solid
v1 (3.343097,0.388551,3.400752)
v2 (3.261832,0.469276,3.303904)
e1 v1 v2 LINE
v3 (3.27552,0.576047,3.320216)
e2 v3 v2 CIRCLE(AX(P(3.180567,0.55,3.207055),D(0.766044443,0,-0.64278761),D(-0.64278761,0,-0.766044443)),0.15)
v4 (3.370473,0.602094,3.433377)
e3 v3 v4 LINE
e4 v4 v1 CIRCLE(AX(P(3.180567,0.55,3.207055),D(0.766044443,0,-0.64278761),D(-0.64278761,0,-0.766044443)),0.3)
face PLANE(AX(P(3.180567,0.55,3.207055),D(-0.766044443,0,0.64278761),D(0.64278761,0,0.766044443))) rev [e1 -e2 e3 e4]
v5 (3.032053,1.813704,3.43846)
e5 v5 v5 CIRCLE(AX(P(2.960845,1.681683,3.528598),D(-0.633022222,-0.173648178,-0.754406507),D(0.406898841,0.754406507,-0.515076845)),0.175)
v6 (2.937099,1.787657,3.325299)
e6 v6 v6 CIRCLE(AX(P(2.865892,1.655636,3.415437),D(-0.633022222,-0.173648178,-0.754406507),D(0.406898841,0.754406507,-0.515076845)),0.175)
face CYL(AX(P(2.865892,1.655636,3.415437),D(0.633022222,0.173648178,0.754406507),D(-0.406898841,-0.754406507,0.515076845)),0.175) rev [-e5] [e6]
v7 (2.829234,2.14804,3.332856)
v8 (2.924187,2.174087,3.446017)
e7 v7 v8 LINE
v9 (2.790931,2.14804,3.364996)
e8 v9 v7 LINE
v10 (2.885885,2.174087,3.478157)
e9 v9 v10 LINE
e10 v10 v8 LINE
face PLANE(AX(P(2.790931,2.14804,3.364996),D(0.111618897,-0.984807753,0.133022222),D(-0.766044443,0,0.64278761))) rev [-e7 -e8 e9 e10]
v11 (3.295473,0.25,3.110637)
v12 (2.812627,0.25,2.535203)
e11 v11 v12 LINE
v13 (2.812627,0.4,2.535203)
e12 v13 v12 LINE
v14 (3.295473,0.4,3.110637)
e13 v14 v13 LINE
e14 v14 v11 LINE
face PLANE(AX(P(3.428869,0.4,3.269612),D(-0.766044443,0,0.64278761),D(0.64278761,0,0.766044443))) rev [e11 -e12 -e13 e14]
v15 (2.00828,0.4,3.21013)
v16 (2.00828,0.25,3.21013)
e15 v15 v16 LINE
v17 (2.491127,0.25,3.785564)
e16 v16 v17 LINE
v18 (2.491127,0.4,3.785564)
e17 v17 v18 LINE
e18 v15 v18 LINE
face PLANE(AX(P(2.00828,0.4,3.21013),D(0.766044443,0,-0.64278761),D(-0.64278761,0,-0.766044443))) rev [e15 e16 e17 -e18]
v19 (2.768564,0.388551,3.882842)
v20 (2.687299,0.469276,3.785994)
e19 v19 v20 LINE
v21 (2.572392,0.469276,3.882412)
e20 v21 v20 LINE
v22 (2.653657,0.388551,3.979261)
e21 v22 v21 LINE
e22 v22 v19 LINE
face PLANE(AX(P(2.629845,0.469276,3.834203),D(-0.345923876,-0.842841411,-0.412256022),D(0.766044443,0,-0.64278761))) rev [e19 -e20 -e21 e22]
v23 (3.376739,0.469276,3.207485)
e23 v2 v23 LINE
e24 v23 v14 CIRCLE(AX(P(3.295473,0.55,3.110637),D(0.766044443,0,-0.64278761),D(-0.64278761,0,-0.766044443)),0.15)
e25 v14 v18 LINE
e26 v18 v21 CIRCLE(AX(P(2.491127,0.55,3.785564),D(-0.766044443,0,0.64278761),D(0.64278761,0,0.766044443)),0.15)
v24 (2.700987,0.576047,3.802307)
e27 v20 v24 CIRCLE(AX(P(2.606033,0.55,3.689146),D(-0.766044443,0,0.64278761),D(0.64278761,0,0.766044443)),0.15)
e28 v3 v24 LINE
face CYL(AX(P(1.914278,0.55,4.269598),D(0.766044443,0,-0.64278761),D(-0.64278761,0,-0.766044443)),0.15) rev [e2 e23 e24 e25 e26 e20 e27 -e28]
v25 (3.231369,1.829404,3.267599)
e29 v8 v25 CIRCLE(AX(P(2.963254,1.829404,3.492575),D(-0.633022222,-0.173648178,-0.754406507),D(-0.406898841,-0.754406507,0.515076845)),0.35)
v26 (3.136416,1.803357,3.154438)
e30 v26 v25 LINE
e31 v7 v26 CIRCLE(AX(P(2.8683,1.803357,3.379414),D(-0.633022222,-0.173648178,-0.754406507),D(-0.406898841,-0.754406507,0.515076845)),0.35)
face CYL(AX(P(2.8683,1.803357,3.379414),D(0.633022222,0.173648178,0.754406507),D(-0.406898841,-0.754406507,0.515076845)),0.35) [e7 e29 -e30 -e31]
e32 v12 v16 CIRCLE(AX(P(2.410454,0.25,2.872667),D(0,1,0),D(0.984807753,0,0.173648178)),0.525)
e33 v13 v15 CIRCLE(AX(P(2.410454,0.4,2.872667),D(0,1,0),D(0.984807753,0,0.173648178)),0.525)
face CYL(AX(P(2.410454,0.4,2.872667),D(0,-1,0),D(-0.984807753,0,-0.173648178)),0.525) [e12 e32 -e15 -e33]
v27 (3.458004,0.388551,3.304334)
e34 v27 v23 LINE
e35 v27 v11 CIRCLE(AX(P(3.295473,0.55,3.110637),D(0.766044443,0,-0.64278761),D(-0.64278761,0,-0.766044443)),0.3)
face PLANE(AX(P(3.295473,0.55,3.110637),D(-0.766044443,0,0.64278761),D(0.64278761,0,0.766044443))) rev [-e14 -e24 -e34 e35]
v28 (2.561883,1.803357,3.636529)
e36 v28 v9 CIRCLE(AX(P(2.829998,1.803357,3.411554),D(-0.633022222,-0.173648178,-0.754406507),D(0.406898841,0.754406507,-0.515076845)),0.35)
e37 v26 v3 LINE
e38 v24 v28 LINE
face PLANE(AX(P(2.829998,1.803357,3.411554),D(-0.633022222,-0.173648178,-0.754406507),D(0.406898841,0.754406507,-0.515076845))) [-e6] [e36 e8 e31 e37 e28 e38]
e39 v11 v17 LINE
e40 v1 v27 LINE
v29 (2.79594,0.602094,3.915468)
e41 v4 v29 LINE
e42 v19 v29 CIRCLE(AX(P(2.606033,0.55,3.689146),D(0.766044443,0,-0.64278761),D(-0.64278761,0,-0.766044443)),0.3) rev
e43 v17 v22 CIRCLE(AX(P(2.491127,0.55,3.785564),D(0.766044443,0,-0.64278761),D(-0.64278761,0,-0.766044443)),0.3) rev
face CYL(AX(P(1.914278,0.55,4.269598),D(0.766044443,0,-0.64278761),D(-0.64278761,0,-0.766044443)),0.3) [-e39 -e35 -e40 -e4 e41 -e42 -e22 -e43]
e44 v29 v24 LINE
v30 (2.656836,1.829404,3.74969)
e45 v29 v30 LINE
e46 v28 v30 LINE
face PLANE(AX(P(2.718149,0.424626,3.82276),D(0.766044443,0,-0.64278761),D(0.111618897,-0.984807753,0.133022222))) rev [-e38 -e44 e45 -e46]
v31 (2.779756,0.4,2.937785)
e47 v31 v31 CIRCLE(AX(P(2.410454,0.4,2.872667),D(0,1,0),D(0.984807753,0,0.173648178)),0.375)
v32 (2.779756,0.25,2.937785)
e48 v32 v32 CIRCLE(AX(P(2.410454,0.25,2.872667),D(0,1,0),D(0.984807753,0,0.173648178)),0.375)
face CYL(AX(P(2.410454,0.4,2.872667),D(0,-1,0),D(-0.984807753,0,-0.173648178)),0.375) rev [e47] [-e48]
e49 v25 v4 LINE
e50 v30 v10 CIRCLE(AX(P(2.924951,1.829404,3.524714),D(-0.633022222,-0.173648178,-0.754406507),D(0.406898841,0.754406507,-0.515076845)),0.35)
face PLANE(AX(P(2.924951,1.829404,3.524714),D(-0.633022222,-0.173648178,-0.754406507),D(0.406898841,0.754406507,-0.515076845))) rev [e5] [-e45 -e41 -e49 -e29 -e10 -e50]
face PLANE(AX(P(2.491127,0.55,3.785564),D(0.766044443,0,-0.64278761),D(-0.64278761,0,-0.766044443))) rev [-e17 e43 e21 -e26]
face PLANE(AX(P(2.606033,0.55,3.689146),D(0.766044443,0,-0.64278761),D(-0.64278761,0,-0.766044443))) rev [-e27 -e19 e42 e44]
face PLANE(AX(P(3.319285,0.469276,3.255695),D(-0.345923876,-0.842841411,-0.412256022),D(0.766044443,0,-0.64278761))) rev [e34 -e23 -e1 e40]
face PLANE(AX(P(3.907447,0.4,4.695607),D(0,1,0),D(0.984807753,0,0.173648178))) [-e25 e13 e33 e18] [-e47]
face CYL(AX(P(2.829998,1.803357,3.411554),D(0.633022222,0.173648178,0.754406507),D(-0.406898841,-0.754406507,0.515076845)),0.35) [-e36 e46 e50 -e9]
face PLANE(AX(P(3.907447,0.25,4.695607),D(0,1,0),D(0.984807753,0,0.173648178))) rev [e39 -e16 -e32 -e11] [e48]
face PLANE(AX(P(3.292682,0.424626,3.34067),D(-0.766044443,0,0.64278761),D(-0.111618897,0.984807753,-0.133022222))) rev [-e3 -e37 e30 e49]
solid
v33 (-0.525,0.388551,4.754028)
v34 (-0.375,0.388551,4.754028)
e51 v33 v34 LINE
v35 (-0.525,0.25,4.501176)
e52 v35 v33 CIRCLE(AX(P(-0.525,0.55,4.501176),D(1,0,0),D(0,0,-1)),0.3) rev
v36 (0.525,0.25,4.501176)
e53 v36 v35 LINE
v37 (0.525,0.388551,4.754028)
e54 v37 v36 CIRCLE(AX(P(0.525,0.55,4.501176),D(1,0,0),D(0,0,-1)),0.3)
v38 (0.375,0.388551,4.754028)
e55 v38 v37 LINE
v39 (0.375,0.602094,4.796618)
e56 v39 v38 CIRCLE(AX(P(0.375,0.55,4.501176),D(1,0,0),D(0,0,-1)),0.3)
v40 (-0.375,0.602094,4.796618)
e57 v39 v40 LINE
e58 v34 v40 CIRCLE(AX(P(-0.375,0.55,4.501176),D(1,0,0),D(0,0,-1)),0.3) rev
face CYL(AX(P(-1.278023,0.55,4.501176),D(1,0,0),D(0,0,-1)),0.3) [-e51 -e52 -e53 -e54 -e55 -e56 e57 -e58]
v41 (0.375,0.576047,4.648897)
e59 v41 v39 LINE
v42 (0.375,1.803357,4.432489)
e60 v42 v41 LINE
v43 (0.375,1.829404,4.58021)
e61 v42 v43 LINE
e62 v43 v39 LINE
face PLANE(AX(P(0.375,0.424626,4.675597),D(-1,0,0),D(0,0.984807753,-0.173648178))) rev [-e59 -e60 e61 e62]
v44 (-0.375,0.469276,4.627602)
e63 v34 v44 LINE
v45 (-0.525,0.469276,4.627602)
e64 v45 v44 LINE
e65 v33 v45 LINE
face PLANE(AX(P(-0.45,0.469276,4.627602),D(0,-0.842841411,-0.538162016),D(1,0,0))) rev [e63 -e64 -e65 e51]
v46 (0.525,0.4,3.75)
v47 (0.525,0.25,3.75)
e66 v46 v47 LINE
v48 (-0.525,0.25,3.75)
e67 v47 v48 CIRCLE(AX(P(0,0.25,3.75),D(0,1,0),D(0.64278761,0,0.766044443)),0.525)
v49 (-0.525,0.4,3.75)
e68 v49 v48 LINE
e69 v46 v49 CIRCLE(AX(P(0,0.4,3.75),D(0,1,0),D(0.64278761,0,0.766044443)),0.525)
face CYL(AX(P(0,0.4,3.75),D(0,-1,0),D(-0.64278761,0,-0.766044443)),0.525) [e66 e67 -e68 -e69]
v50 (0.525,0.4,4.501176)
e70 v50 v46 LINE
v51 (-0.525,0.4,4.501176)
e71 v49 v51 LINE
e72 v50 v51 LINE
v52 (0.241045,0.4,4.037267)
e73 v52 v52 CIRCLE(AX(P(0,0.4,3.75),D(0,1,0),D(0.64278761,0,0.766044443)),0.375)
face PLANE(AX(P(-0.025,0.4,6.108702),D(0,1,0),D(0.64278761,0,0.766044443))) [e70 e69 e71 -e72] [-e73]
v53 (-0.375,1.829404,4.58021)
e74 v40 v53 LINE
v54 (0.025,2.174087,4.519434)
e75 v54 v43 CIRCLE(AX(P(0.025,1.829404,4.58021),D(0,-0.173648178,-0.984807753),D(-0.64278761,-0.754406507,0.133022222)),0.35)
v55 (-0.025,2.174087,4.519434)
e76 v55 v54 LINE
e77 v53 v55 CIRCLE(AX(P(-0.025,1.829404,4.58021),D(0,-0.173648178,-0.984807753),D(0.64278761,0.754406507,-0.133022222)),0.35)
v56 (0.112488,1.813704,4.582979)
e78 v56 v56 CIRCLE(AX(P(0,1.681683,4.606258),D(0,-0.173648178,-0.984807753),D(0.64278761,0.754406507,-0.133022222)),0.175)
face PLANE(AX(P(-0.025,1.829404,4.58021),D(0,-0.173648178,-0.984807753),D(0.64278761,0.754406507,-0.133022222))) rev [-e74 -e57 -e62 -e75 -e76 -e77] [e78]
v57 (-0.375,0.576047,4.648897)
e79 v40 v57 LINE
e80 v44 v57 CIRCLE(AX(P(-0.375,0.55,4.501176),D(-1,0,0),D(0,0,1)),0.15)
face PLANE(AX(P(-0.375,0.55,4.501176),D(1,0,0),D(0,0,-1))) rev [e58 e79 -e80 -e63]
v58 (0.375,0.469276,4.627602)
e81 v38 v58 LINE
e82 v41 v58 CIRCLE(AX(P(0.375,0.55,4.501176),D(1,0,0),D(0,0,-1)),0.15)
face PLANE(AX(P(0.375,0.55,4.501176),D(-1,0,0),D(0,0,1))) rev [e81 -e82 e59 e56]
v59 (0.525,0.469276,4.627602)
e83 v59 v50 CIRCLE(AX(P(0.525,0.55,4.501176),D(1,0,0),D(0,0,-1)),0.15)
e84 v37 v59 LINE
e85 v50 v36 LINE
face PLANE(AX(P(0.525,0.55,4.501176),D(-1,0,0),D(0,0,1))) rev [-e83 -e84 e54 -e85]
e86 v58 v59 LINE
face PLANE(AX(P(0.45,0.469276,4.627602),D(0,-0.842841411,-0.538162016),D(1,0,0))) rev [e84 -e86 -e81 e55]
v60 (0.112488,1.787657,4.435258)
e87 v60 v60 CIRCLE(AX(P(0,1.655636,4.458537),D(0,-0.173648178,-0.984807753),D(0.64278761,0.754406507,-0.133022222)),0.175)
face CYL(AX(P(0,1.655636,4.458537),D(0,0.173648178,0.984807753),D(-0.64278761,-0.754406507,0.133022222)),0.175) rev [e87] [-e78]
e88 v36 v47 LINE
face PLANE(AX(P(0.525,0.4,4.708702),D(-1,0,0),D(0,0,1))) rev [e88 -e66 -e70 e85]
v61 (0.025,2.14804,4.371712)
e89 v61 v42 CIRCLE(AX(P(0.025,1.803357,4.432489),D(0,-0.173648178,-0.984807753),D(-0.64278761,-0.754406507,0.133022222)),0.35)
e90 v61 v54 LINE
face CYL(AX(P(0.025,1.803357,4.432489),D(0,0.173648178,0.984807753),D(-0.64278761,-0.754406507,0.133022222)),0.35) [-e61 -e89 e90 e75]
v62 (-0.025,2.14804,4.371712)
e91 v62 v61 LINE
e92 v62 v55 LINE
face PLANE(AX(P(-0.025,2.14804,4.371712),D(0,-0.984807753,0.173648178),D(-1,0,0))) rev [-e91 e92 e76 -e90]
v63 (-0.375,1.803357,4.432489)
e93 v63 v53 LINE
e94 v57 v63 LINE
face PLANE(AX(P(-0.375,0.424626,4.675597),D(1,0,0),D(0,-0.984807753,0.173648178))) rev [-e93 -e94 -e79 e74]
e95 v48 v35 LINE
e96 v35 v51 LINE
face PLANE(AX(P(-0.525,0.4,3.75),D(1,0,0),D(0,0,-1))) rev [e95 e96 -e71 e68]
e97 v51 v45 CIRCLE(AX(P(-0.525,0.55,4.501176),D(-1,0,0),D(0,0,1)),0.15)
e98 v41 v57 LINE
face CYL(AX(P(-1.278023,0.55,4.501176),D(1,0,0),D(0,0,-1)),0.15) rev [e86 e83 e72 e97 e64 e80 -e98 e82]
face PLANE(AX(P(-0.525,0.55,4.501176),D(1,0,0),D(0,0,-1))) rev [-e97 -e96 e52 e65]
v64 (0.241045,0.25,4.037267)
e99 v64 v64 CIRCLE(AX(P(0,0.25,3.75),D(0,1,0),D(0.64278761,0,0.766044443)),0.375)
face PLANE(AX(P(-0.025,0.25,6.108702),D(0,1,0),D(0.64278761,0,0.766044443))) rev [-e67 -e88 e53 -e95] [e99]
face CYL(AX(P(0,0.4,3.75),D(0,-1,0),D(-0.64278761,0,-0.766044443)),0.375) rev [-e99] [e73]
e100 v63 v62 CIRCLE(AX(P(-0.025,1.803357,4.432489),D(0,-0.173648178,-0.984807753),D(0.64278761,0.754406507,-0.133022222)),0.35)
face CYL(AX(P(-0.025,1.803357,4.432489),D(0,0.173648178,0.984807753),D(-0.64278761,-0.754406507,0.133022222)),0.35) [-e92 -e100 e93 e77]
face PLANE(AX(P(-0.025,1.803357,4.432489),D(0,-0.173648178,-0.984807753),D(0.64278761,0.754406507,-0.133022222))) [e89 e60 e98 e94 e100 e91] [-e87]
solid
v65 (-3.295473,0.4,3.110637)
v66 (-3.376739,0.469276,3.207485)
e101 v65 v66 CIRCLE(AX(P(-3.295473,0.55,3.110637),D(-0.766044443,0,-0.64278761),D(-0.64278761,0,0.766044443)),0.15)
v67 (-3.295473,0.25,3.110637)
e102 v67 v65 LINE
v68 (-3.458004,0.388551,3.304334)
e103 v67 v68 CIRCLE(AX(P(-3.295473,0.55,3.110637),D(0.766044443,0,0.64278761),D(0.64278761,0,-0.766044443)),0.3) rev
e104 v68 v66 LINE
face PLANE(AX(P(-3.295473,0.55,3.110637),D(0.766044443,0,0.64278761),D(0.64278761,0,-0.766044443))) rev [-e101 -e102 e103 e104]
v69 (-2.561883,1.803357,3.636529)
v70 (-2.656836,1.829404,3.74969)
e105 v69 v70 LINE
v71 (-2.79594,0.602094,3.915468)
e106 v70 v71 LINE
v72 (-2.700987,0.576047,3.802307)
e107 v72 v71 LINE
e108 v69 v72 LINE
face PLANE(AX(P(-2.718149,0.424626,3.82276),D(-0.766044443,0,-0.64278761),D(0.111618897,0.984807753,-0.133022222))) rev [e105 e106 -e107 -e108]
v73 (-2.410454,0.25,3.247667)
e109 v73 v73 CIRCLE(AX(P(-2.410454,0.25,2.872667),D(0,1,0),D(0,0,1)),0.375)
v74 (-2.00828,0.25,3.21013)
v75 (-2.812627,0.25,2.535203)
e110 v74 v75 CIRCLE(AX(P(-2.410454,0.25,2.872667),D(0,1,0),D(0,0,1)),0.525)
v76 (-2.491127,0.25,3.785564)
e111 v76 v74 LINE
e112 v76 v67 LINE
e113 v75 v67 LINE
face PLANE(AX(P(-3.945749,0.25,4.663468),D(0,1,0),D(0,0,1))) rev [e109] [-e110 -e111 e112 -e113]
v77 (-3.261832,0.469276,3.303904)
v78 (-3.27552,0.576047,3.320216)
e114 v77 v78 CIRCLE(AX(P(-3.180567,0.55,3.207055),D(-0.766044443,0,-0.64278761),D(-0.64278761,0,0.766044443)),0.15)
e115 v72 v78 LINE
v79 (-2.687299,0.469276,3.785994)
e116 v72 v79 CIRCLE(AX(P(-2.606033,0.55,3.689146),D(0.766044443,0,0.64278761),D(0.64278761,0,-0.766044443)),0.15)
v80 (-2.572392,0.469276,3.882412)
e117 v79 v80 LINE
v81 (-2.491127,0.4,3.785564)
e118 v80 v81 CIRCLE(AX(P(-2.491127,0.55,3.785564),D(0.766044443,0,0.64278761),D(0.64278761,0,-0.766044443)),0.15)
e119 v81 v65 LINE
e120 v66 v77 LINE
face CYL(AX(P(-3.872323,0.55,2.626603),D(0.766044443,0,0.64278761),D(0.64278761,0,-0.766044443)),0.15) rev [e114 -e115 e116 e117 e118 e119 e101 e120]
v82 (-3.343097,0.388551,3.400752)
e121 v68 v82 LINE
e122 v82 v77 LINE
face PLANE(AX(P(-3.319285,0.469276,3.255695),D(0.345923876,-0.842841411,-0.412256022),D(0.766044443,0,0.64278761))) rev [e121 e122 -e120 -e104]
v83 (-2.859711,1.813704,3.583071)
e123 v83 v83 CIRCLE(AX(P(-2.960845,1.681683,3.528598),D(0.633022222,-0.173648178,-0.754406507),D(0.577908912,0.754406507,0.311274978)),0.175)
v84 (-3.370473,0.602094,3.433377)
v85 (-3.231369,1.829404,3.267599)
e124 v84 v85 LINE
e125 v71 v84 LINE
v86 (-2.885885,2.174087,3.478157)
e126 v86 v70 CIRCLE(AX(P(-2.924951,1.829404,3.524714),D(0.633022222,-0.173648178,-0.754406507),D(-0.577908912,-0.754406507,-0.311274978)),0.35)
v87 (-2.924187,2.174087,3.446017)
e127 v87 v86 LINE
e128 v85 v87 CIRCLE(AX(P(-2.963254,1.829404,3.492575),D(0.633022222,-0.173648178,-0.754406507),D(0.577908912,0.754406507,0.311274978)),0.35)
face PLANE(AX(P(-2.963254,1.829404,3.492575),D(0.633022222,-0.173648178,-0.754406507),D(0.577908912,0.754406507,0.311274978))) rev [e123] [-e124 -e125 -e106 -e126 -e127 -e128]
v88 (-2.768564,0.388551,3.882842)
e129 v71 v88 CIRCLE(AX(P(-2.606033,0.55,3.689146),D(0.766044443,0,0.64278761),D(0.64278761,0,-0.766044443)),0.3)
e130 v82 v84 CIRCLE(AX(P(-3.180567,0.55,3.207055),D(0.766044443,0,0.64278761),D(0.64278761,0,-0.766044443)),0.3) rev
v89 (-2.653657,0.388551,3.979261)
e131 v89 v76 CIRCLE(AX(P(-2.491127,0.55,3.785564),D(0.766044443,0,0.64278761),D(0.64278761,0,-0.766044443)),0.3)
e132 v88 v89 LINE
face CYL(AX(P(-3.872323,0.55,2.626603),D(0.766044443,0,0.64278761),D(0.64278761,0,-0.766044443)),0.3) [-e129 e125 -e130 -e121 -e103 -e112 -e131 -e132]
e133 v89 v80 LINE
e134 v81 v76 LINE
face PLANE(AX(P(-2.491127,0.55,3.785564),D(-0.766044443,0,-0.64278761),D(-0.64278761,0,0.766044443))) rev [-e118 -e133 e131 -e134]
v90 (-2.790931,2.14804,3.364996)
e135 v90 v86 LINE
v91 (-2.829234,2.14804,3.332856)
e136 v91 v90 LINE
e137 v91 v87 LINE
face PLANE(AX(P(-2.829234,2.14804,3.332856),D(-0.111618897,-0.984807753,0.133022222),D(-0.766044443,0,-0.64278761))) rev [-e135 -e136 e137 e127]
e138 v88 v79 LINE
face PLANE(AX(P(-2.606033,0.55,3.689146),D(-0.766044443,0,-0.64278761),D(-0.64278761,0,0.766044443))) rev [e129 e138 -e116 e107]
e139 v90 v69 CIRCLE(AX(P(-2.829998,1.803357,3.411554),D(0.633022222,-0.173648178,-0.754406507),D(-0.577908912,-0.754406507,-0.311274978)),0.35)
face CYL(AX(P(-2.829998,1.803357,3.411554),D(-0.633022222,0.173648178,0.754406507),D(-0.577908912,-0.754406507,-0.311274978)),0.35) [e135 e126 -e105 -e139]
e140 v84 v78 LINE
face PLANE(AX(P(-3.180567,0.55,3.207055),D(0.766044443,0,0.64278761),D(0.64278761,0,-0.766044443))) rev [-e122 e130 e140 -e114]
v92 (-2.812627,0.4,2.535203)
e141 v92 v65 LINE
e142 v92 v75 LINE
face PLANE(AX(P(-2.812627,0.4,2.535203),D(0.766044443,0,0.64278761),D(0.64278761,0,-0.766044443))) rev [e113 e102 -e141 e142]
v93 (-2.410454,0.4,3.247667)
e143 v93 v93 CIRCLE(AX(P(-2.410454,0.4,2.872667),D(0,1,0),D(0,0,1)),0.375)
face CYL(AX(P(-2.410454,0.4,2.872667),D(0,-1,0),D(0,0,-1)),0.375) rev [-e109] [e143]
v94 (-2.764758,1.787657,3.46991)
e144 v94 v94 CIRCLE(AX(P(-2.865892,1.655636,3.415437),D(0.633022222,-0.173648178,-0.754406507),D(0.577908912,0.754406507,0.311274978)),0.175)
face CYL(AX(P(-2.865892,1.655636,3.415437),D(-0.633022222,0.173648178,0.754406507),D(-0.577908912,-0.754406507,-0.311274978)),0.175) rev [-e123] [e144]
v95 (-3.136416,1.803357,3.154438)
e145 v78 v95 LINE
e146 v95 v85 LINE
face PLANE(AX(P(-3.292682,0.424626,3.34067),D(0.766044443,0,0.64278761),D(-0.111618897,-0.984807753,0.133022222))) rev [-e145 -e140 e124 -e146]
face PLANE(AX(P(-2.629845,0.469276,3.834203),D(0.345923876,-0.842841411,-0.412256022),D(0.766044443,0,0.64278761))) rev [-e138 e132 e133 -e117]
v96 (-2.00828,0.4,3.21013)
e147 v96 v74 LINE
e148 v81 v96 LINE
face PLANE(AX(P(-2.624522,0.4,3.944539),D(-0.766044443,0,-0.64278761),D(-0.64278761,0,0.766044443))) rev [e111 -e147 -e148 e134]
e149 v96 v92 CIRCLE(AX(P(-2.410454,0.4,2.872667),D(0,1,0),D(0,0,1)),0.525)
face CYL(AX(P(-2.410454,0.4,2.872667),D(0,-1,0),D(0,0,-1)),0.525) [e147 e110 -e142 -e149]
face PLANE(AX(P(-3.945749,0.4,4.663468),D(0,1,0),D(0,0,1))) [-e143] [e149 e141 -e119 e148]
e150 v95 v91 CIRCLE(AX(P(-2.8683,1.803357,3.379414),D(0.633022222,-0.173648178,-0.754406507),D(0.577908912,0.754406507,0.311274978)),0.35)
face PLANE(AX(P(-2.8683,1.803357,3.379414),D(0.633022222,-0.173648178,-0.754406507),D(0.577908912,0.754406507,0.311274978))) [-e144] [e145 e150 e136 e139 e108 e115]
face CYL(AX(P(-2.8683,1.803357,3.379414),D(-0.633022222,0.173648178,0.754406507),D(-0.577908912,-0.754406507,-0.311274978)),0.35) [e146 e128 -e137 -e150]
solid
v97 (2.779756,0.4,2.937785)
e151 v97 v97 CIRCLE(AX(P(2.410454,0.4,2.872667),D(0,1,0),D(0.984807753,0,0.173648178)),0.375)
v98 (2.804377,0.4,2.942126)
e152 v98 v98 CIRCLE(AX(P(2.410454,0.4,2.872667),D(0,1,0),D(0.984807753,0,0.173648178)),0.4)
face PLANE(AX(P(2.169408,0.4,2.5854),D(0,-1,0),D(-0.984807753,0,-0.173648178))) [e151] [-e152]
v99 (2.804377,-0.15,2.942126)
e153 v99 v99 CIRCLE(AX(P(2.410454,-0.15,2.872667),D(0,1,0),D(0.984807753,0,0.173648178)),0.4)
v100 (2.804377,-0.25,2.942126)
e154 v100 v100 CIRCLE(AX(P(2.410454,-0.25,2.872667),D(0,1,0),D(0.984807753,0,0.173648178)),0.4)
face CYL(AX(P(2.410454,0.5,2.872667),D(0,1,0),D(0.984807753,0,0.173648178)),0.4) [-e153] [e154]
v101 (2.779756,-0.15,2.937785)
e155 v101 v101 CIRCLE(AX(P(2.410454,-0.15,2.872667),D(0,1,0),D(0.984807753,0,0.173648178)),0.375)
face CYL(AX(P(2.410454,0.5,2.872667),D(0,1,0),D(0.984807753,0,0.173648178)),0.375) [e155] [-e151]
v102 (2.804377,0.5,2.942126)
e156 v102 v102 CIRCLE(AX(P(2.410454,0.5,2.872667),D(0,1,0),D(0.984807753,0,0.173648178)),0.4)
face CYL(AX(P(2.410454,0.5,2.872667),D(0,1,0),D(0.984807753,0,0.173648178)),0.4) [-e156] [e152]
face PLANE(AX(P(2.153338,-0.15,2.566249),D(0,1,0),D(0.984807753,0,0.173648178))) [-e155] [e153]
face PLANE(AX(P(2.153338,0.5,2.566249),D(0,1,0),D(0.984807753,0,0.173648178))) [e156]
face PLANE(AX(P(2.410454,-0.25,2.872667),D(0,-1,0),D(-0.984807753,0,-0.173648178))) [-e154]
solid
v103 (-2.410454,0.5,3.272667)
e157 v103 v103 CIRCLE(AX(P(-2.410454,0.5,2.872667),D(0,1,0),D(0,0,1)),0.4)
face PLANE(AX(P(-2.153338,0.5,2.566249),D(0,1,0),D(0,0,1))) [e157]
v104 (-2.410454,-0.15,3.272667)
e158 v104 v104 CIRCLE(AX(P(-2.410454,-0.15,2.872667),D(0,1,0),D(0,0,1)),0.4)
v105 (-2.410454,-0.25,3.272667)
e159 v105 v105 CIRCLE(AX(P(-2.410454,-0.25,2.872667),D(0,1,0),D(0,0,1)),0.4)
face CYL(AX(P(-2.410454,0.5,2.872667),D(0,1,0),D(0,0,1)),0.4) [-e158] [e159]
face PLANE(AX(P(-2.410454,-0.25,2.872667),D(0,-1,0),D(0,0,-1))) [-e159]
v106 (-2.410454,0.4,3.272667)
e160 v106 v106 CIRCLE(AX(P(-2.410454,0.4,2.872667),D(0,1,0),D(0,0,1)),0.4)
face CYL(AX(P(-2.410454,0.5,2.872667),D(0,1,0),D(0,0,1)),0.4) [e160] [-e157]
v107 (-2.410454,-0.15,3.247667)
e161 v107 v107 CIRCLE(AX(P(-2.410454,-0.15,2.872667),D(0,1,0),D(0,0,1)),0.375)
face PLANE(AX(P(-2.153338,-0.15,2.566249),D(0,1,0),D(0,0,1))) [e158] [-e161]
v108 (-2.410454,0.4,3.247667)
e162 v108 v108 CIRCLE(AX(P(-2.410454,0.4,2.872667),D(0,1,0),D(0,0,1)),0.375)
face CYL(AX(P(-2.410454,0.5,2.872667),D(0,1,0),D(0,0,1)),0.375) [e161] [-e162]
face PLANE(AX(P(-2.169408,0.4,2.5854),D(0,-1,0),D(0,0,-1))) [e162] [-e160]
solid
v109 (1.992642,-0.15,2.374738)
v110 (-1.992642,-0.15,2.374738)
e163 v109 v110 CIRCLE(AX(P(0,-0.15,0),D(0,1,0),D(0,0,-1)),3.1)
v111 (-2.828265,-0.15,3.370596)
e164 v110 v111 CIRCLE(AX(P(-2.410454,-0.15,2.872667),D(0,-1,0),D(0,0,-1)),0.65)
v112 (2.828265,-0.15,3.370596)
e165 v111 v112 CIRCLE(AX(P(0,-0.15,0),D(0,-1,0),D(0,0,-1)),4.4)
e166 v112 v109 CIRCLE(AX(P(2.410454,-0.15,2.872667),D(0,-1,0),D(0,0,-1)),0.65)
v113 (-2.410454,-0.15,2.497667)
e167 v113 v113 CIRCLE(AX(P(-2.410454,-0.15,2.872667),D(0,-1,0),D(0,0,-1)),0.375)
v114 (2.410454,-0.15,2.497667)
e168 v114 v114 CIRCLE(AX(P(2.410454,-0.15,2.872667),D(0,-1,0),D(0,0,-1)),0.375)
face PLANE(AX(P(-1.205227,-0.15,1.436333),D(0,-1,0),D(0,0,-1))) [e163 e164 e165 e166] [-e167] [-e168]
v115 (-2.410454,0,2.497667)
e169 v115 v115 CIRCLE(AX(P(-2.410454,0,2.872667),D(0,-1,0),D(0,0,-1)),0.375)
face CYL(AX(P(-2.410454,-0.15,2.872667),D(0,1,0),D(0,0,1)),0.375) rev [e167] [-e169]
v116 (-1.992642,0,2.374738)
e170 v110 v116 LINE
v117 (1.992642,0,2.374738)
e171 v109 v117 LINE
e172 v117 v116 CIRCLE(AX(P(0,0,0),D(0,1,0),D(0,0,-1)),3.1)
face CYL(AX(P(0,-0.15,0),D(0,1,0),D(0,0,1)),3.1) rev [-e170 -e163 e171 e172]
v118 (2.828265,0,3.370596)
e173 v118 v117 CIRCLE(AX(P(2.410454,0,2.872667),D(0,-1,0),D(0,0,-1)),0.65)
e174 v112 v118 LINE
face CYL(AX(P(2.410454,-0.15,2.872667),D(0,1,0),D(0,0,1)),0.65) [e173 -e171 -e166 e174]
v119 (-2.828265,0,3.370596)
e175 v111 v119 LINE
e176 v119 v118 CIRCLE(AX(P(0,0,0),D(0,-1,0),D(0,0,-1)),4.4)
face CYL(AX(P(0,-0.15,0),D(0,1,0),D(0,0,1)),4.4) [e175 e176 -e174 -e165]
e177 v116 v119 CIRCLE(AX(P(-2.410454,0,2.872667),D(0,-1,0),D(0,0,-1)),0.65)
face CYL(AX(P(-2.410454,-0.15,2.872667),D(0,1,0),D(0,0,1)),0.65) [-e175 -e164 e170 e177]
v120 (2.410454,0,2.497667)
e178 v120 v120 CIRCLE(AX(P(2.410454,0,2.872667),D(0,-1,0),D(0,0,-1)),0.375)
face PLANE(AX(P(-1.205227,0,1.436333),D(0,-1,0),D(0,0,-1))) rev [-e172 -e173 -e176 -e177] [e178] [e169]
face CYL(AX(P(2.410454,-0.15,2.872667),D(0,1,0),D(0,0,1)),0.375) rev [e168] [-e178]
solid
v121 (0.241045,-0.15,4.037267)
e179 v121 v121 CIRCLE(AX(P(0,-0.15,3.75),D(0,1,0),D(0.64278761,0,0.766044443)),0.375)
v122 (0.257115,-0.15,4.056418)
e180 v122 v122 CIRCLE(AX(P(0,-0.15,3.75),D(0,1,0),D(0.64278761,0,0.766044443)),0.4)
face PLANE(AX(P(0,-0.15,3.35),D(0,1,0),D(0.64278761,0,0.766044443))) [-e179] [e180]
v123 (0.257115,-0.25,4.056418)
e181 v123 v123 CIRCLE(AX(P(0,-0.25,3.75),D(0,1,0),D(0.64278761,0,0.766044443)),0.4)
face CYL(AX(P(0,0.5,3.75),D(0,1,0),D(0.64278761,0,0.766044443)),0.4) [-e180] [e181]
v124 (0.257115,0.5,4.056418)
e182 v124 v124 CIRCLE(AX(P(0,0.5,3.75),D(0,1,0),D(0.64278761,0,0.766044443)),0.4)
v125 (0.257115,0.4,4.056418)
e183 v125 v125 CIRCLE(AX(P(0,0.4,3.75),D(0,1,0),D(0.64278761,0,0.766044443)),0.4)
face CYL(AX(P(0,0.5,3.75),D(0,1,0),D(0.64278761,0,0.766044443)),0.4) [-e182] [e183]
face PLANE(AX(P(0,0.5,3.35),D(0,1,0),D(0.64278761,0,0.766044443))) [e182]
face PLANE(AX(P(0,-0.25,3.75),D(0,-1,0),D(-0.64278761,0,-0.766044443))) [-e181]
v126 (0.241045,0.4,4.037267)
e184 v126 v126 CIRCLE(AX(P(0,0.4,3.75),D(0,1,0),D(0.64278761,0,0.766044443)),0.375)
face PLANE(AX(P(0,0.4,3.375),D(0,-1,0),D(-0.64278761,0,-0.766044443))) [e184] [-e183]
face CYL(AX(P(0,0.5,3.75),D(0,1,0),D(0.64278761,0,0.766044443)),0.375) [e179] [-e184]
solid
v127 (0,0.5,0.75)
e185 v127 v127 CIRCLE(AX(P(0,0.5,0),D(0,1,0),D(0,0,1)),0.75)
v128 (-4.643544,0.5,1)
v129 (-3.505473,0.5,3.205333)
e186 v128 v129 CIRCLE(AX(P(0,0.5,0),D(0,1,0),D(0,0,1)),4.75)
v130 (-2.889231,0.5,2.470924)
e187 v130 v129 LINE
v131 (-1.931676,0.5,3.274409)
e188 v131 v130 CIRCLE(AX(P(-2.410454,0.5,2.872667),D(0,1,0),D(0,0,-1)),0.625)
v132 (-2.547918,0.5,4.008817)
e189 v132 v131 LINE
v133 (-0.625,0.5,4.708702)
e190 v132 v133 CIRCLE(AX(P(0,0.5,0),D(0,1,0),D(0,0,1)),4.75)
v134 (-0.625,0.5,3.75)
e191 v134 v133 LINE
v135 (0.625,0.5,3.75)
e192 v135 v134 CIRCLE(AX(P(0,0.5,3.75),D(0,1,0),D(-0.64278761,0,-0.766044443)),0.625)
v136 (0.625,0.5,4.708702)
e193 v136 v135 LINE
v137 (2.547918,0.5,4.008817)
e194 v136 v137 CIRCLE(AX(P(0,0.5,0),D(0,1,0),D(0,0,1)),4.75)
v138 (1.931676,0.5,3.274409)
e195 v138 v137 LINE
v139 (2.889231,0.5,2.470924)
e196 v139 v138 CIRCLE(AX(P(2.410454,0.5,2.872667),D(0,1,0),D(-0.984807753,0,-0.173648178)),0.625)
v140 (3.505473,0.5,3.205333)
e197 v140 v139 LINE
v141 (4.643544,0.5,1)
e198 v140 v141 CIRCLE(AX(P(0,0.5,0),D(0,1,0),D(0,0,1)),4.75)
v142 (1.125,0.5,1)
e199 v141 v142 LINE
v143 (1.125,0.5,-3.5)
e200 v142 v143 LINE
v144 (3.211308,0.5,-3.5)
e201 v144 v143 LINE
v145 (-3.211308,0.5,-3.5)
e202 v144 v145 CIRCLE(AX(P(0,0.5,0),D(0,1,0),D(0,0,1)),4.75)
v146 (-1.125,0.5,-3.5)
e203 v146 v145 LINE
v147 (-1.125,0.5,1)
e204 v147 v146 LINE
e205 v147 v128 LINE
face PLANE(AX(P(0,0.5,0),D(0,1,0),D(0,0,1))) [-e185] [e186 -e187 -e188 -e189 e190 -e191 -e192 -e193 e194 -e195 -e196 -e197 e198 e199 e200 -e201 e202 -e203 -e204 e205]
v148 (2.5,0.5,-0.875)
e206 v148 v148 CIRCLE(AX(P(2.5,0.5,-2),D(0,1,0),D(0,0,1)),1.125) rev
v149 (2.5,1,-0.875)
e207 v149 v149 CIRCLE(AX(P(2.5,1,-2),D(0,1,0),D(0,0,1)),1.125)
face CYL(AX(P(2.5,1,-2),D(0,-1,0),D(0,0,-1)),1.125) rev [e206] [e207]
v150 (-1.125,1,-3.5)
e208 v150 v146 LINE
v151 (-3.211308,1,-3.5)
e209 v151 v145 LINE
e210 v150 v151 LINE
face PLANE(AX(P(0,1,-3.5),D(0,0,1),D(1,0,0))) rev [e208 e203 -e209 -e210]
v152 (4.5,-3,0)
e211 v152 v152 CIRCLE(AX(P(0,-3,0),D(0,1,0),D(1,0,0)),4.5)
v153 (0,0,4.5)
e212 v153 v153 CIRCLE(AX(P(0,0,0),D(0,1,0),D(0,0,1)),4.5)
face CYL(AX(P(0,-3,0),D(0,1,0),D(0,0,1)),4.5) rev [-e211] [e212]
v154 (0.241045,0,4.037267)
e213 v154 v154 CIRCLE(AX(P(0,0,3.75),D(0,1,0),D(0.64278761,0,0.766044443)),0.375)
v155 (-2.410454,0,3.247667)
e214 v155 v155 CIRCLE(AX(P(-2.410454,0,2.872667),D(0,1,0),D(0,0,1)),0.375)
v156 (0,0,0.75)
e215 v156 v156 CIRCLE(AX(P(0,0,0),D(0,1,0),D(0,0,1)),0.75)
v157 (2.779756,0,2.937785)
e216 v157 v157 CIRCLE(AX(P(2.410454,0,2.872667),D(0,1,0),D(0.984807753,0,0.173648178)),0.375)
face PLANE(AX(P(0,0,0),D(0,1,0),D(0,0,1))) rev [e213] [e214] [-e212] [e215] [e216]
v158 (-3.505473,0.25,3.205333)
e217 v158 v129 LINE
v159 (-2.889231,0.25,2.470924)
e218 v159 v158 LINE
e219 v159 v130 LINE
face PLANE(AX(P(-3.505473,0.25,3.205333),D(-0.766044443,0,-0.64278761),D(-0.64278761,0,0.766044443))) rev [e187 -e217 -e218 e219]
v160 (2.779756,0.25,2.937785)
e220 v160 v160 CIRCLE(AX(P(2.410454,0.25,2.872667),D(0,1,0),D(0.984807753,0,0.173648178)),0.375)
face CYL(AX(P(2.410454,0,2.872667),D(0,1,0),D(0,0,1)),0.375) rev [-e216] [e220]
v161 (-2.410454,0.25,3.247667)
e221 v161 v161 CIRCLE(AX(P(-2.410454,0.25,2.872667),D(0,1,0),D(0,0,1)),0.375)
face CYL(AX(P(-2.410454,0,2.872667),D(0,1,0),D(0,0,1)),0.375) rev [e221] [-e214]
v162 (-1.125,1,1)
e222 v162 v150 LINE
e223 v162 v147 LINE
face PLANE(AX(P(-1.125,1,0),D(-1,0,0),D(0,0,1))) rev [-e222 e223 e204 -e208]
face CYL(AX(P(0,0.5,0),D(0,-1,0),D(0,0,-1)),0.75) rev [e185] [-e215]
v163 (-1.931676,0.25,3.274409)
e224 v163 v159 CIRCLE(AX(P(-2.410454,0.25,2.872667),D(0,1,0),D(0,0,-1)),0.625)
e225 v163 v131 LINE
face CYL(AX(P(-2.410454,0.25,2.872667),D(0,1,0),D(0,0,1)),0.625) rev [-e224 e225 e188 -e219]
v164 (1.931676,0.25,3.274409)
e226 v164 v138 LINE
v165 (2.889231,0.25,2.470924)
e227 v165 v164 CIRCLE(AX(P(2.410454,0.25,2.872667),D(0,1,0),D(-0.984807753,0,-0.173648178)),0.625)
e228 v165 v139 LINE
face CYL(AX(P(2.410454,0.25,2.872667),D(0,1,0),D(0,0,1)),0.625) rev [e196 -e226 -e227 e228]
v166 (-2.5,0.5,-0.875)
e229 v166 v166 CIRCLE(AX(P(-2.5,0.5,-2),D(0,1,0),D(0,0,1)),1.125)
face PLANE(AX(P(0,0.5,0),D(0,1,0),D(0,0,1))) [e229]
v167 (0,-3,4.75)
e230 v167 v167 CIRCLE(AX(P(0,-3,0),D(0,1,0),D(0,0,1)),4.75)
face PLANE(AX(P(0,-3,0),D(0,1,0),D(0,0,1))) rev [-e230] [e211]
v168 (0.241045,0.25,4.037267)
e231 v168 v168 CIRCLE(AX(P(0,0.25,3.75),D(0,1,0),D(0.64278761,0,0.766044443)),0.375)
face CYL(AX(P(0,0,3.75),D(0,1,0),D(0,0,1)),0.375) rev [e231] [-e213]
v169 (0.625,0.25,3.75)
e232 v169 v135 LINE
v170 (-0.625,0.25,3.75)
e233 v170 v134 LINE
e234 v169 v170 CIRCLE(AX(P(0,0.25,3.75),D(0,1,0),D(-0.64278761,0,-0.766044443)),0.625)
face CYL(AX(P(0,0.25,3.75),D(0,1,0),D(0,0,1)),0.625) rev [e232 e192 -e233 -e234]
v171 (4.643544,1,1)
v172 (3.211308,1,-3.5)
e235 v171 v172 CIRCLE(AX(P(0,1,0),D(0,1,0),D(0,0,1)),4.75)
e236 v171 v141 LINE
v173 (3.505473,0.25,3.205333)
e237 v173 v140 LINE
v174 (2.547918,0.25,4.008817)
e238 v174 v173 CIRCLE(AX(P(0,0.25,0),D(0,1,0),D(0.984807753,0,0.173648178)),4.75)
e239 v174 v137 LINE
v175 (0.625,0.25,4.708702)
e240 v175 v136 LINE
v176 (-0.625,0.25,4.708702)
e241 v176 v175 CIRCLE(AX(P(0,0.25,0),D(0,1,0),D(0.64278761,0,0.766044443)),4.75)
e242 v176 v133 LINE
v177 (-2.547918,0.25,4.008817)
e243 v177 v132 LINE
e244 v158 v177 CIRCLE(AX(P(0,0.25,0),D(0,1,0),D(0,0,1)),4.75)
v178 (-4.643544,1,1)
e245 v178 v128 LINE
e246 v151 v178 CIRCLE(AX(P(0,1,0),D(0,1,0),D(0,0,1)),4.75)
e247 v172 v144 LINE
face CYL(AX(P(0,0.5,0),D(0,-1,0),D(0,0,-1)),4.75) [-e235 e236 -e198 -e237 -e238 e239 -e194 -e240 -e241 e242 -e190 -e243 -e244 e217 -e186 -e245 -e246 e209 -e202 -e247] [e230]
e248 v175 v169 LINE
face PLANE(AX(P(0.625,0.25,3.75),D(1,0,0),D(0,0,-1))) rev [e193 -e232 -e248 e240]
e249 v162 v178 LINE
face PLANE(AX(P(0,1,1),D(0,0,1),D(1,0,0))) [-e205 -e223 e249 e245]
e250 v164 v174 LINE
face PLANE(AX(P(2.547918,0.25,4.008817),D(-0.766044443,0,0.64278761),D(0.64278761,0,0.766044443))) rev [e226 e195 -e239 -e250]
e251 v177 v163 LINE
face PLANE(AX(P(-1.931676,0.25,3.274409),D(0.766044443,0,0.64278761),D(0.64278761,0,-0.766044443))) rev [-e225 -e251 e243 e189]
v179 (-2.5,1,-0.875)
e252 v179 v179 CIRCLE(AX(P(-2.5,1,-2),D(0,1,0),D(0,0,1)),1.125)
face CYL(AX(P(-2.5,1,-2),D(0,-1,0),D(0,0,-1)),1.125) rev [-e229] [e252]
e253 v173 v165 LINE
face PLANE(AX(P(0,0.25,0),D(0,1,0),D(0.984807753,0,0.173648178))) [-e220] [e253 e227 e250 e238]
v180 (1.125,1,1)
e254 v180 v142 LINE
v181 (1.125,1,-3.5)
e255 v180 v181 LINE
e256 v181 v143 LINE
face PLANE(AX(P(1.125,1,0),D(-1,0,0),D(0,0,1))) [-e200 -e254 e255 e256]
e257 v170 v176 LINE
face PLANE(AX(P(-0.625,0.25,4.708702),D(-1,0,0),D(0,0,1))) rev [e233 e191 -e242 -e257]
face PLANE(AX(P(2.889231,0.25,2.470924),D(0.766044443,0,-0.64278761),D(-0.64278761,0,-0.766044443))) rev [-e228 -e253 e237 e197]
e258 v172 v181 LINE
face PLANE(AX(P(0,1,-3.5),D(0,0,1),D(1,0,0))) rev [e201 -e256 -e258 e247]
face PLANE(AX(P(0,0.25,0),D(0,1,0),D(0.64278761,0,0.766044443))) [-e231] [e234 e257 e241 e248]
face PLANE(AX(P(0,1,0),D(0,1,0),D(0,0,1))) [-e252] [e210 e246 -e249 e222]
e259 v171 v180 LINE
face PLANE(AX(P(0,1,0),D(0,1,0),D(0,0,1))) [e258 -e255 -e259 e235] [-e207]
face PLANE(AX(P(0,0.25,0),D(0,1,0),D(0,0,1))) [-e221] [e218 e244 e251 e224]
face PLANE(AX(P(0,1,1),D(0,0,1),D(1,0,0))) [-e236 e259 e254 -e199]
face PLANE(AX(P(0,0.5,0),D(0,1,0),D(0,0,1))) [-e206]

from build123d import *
from build123d.topology import SkipClean

# Parameters (mm, degrees)
SKETCH1_R                  = 4.75
SKETCH1_R_2                = 0.75
BOSS_EXTRUDE1_DEPTH        = 0.5
BOSS_EXTRUDE3_START        = 0.5
SKETCH1_4_R                = 1.125
BOSS_EXTRUDE3_DEPTH        = 0.5
SKETCH3_R                  = 0.375
CUT_EXTRUDE1_DEPTH         = 7.736096793
CUT_EXTRUDE2_START         = -0.25
SKETCH3_3_R                = 0.375
CUT_EXTRUDE2_DEPTH         = 0.25
CIRPATTERN1_COUNT          = 3
CIRPATTERN1_ANGLE          = 80
EXTRUDE_THIN1_START        = -3
SKETCH1_5_R                = 4.75
SKETCH1_5_R_2              = 4.5
EXTRUDE_THIN1_DEPTH        = 3
BASE_FLANGE1_START         = 0.15
SKETCH4_R                  = 0.375
SKETCH4_R_2                = 0.175
BASE_FLANGE1_DEPTH         = 0.15
SKETCHED_START             = -0.525
SKETCHED_BEND1_DEPTH       = 1.05
SKETCHED_BEND1_2_DEPTH     = 1.05
SKETCHED_START_2           = -0.375
SKETCHED_BEND1_3_DEPTH     = 0.75
SKETCHED_START_3           = -4.828299493
SKETCHED_BEND1_4_OUTLINE_R = 0.175
SKETCHED_BEND1_4_DEPTH     = 0.149999999
SKETCH10_R                 = 0.375
BASE_FLANGE2_DEPTH         = 0.15
CIRPATTERN2_COUNT          = 3
CIRPATTERN2_ANGLE          = 80


with BuildPart() as part:
    # Sketch1 → Boss-Extrude1 (new body)
    with BuildSketch(Plane(origin=(0, 0, 0), x_dir=(1, 0, 0), z_dir=(0, 1, 0))):
        with Locations(Location((0, 0, 0), (0, 0, 270))):
            Circle(SKETCH1_R)
        with Locations(Location((0, 0, 0), (0, 0, 270))):
            Circle(SKETCH1_R_2, mode=Mode.SUBTRACT)
    extrude(amount=BOSS_EXTRUDE1_DEPTH)

    # Sketch1<4> → Boss-Extrude3 (add)
    # profile 1 of 2: a face of its own
    with BuildSketch(Plane(origin=(0, 0, 0), x_dir=(1, 0, 0), z_dir=(0, 1, 0)).offset(BOSS_EXTRUDE3_START)):
        with BuildLine():
            ThreePointArc((-3.211308145, 3.5), (-4.526276083, 1.440598771), (-4.643543905, -1))
            Line((-4.643543905, -1), (-1.125, -1))
            Line((-1.125, -1), (-1.125, 3.5))
            Line((-1.125, 3.5), (-3.211308145, 3.5))
        make_face()
        with Locations(Location((-2.5, 2, 0), (0, 0, 270))):
            Circle(SKETCH1_4_R, mode=Mode.SUBTRACT)
    # profile 2 of 2: a face of its own
    with BuildSketch(Plane(origin=(0, 0, 0), x_dir=(1, 0, 0), z_dir=(0, 1, 0)).offset(BOSS_EXTRUDE3_START)):
        with BuildLine():
            Line((1.125, -1), (4.643543905, -1))
            ThreePointArc((4.643543905, -1), (4.723310997, -0.502825243), (4.75, 0))
            ThreePointArc((4.75, 0), (4.348345299, 1.911646713), (3.211308145, 3.5))
            Line((3.211308145, 3.5), (1.125, 3.5))
            Line((1.125, 3.5), (1.125, -1))
        make_face()
        with Locations(Location((2.5, 2, 0), (0, 0, 270))):
            Circle(SKETCH1_4_R, mode=Mode.SUBTRACT)
    extrude(amount=BOSS_EXTRUDE3_DEPTH)

    # Sketch3 → Cut-Extrude1 (cut, through all)
    with BuildSketch(Plane(origin=(0, 0.5, 0), x_dir=(1, 0, 0), z_dir=(0, 1, 0))):
        with Locations(Location((-2.410453536, -2.872666662, 0), (0, 0, 270))):
            Circle(SKETCH3_R)
    cut_extrude1 = extrude(amount=-CUT_EXTRUDE1_DEPTH, mode=Mode.SUBTRACT)

    # Sketch3<3> → Cut-Extrude2 (cut)
    with BuildSketch(Plane(origin=(0, 0.5, 0), x_dir=(1, 0, 0), z_dir=(0, 1, 0)).offset(CUT_EXTRUDE2_START)):
        with BuildLine():
            Line((-3.505473113, -3.205332784), (-2.889231313, -2.470924406))
            ThreePointArc((-2.889231313, -2.470924406), (-2.00871128, -2.393888885), (-1.931675759, -3.274408918))
            Line((-1.931675759, -3.274408918), (-2.547917559, -4.008817296))
            ThreePointArc((-2.547917559, -4.008817296), (-3.053241146, -3.638711105), (-3.505473113, -3.205332784))
        make_face()
        with Locations(Location((-2.410453536, -2.872666662, 0), (0, 0, 270))):
            Circle(SKETCH3_3_R, mode=Mode.SUBTRACT)
    cut_extrude2 = extrude(amount=CUT_EXTRUDE2_DEPTH, mode=Mode.SUBTRACT)

    # CirPattern1: Cut-Extrude1, Cut-Extrude2 ×3 about axis
    cirpattern1_axis = Axis((0, 0, 0), (0, 1, 0))
    add([cut_extrude1.rotate(cirpattern1_axis, i * CIRPATTERN1_ANGLE / (CIRPATTERN1_COUNT - 1)) for i in range(1, CIRPATTERN1_COUNT)], mode=Mode.SUBTRACT)
    add([cut_extrude2.rotate(cirpattern1_axis, i * CIRPATTERN1_ANGLE / (CIRPATTERN1_COUNT - 1)) for i in range(1, CIRPATTERN1_COUNT)], mode=Mode.SUBTRACT)

    # Sketch1<5> → Extrude-Thin1 (add)
    with BuildSketch(Plane(origin=(0, 0, 0), x_dir=(1, 0, 0), z_dir=(0, 1, 0)).offset(EXTRUDE_THIN1_START)):
        Circle(SKETCH1_5_R)
        Circle(SKETCH1_5_R_2, mode=Mode.SUBTRACT)
    extrude(amount=EXTRUDE_THIN1_DEPTH)


with BuildPart() as body_2:
    # Base-Flange1: sheet metal written as solids
    # Sketch4 → Base-Flange1 (new body)
    with BuildSketch(Plane(origin=(0, 0.25, 0), x_dir=(1, 0, 0), z_dir=(0, 1, 0)).offset(BASE_FLANGE1_START)):
        with BuildLine():
            Line((-3.313962002, -3.366029686), (-3.428868668, -3.269611545))
            Line((-3.428868668, -3.269611545), (-2.812626869, -2.535203167))
            ThreePointArc((-2.812626869, -2.535203167), (-2.072990041, -2.470493329), (-2.008280204, -3.210130157))
            Line((-2.008280204, -3.210130157), (-2.624522003, -3.944538535))
            Line((-2.624522003, -3.944538535), (-2.73942867, -3.848120394))
            Line((-2.73942867, -3.848120394), (-3.639331323, -4.920582614))
            ThreePointArc((-3.639331323, -4.920582614), (-3.876942368, -5.044275095), (-4.132422542, -4.963722506))
            Line((-4.132422542, -4.963722506), (-4.170724764, -4.931583125))
            ThreePointArc((-4.170724764, -4.931583125), (-4.294417245, -4.69397208), (-4.213864655, -4.438491907))
            Line((-4.213864655, -4.438491907), (-3.313962002, -3.366029686))
        make_face()
        with Locations(Location((-2.410453536, -2.872666662, 0), (0, 0, 270))):
            Circle(SKETCH4_R, mode=Mode.SUBTRACT)
        with Locations(Location((-3.830179848, -4.564630594, 0), (0, 0, 270))):
            Circle(SKETCH4_R_2, mode=Mode.SUBTRACT)
    extrude(amount=-BASE_FLANGE1_DEPTH)

    # Sketched Bend1: read off the stored shape, not the designer's step
    # Sketched Bend1 outline → Sketched Bend1 (cut)
    with BuildSketch(Plane(origin=(0, 0, 0), x_dir=(0.6427876096865348, 0, -0.7660444431189818), z_dir=(0.7660444431189818, 0, 0.6427876096865349)).offset(SKETCHED_START)):
        with BuildLine():
            Line((-4.760983594, 0.4), (-6.45870205, 0.4))
            Line((-6.45870205, 0.4), (-6.45870205, 0.25))
            Line((-6.45870205, 0.25), (-4.501175973, 0.25))
            ThreePointArc((-4.501175973, 0.25), (-4.651175973, 0.290192379), (-4.760983594, 0.4))
        make_face()
    extrude(amount=SKETCHED_BEND1_DEPTH, mode=Mode.SUBTRACT)

    # Sketched Bend1 2 outline → Sketched Bend1 2 (add)
    with SkipClean():  # the faces are left unmerged after this step: merging them gives an invalid solid
        with BuildSketch(Plane(origin=(0, 0, 0), x_dir=(0.6427876096865348, 0, -0.7660444431189818), z_dir=(0.7660444431189818, 0, 0.6427876096865349)).offset(SKETCHED_START)):
            with BuildLine():
                ThreePointArc((-4.501175973, 0.4), (-4.57325702, 0.418454105), (-4.627602184, 0.469275698))
                Line((-4.627602184, 0.469275698), (-4.754028396, 0.388551395))
                ThreePointArc((-4.754028396, 0.388551395), (-4.73301345, 0.359602037), (-4.70870205, 0.333359913))
                Line((-4.70870205, 0.333359913), (-4.70870205, 0.4))
                Line((-4.70870205, 0.4), (-4.501175973, 0.4))
            make_face()
        extrude(amount=SKETCHED_BEND1_2_DEPTH)

    # Sketched Bend1 3 outline → Sketched Bend1 3 (add)
    with SkipClean():  # the faces are left unmerged after this step: merging them gives an invalid solid
        with BuildSketch(Plane(origin=(0, 0, 0), x_dir=(0.6427876096865348, 0, -0.7660444431189818), z_dir=(0.7660444431189818, 0, 0.6427876096865349)).offset(SKETCHED_START_2)):
            with BuildLine():
                ThreePointArc((-4.627602184, 0.469275698), (-4.648278779, 0.520661214), (-4.648897136, 0.576047227))
                Line((-4.648897136, 0.576047227), (-4.371712461, 2.148039633))
                Line((-4.371712461, 2.148039633), (-4.519433624, 2.174086859))
                Line((-4.519433624, 2.174086859), (-4.796618299, 0.602094453))
                ThreePointArc((-4.796618299, 0.602094453), (-4.796618299, 0.497905546), (-4.760983594, 0.4))
                Line((-4.760983594, 0.4), (-4.736098185, 0.4))
                Line((-4.736098185, 0.4), (-4.627602184, 0.469275698))
            make_face()
        extrude(amount=SKETCHED_BEND1_3_DEPTH)

    # Sketched Bend1 4 outline → Sketched Bend1 4 (cut)
    with SkipClean():  # the faces are left unmerged after this step: merging them gives an invalid solid
        with BuildSketch(Plane(origin=(0, 0, 0), x_dir=(0.7741336234862138, 0.1419950663058057, 0.6168910228986272), z_dir=(0.6330222215594842, -0.17364817766693405, -0.7544065067354924)).offset(SKETCHED_START_3)):
            with BuildLine():
                Line((-0.175527489, -1.396163693), (0.170815245, -1.345698743))
                ThreePointArc((0.170815245, -1.345698743), (-0.088866892, -1.279941413), (-0.225992438, -1.049820959))
                Line((-0.225992438, -1.049820959), (-0.175527489, -1.396163693))
            make_face()
            with BuildLine():
                ThreePointArc((0.516170562, -0.941681782), (0.450413232, -1.201363919), (0.220292778, -1.338489465))
                Line((0.220292778, -1.338489465), (0.566635511, -1.288024516))
                Line((0.566635511, -1.288024516), (0.516170562, -0.941681782))
            make_face()
            with Locations((0.123461227, -0.847318771)):
                Circle(SKETCHED_BEND1_4_OUTLINE_R)
        extrude(amount=SKETCHED_BEND1_4_DEPTH, mode=Mode.SUBTRACT)


with BuildPart() as body_3:
    # Base-Flange2: sheet metal written as solids
    # Sketch10 → Base-Flange2 (new body)
    with BuildSketch(Plane.XZ):
        with BuildLine():
            ThreePointArc((-2.828265483, 3.37059555), (0, -4.4), (2.828265483, 3.37059555))
            ThreePointArc((2.828265483, 3.37059555), (1.912524648, 3.290478608), (1.99264159, 2.374737774))
            ThreePointArc((1.99264159, 2.374737774), (0, -3.1), (-1.99264159, 2.374737774))
            ThreePointArc((-1.99264159, 2.374737774), (-1.912524648, 3.290478608), (-2.828265483, 3.37059555))
        make_face()
        with Locations(Location((-2.410453536, 2.872666662, 0), (0, 0, 270))):
            Circle(SKETCH10_R, mode=Mode.SUBTRACT)
        with Locations(Location((2.410453536, 2.872666662, 0), (0, 0, 270))):
            Circle(SKETCH10_R, mode=Mode.SUBTRACT)
    extrude(amount=BASE_FLANGE2_DEPTH)


with BuildPart() as body_4:
    # Sketch14 → Revolve1 (revolve)
    with BuildSketch(Plane(origin=(0, 0, 0), x_dir=(-0.6427876096865347, 0, 0.7660444431189819), z_dir=(-0.7660444431189819, 0, -0.6427876096865347)), mode=Mode.PRIVATE) as revolve1_sk:
        Polygon((3.375, 0.4), (3.35, 0.4), (3.35, 0.5), (3.75, 0.5), (3.75, -0.25), (3.35, -0.25), (3.35, -0.15), (3.375, -0.15), align=None)
    revolve(revolve1_sk.sketch.rotate(Axis((-2.410453536, 0.5, 2.872666662), (0, -1, 0)), 140), axis=Axis((-2.410453536, 0.5, 2.872666662), (0, -1, 0)))


with BuildPart() as cirpattern2_1:
    # CirPattern2: pattern copy
    add(body_2.part.rotate(Axis((0, 0, 0), (0, 1, 0)), 1 * CIRPATTERN2_ANGLE / (CIRPATTERN2_COUNT - 1)))


with BuildPart() as cirpattern2_2:
    # CirPattern2: pattern copy
    add(body_2.part.rotate(Axis((0, 0, 0), (0, 1, 0)), 2 * CIRPATTERN2_ANGLE / (CIRPATTERN2_COUNT - 1)))


with BuildPart() as cirpattern2_3:
    # CirPattern2: pattern copy
    add(body_4.part.rotate(Axis((0, 0, 0), (0, 1, 0)), 1 * CIRPATTERN2_ANGLE / (CIRPATTERN2_COUNT - 1)))


with BuildPart() as cirpattern2_4:
    # CirPattern2: pattern copy
    add(body_4.part.rotate(Axis((0, 0, 0), (0, 1, 0)), 2 * CIRPATTERN2_ANGLE / (CIRPATTERN2_COUNT - 1)))


solid = Compound([part.part, body_2.part, body_3.part, body_4.part, cirpattern2_1.part, cirpattern2_2.part, cirpattern2_3.part, cirpattern2_4.part])
